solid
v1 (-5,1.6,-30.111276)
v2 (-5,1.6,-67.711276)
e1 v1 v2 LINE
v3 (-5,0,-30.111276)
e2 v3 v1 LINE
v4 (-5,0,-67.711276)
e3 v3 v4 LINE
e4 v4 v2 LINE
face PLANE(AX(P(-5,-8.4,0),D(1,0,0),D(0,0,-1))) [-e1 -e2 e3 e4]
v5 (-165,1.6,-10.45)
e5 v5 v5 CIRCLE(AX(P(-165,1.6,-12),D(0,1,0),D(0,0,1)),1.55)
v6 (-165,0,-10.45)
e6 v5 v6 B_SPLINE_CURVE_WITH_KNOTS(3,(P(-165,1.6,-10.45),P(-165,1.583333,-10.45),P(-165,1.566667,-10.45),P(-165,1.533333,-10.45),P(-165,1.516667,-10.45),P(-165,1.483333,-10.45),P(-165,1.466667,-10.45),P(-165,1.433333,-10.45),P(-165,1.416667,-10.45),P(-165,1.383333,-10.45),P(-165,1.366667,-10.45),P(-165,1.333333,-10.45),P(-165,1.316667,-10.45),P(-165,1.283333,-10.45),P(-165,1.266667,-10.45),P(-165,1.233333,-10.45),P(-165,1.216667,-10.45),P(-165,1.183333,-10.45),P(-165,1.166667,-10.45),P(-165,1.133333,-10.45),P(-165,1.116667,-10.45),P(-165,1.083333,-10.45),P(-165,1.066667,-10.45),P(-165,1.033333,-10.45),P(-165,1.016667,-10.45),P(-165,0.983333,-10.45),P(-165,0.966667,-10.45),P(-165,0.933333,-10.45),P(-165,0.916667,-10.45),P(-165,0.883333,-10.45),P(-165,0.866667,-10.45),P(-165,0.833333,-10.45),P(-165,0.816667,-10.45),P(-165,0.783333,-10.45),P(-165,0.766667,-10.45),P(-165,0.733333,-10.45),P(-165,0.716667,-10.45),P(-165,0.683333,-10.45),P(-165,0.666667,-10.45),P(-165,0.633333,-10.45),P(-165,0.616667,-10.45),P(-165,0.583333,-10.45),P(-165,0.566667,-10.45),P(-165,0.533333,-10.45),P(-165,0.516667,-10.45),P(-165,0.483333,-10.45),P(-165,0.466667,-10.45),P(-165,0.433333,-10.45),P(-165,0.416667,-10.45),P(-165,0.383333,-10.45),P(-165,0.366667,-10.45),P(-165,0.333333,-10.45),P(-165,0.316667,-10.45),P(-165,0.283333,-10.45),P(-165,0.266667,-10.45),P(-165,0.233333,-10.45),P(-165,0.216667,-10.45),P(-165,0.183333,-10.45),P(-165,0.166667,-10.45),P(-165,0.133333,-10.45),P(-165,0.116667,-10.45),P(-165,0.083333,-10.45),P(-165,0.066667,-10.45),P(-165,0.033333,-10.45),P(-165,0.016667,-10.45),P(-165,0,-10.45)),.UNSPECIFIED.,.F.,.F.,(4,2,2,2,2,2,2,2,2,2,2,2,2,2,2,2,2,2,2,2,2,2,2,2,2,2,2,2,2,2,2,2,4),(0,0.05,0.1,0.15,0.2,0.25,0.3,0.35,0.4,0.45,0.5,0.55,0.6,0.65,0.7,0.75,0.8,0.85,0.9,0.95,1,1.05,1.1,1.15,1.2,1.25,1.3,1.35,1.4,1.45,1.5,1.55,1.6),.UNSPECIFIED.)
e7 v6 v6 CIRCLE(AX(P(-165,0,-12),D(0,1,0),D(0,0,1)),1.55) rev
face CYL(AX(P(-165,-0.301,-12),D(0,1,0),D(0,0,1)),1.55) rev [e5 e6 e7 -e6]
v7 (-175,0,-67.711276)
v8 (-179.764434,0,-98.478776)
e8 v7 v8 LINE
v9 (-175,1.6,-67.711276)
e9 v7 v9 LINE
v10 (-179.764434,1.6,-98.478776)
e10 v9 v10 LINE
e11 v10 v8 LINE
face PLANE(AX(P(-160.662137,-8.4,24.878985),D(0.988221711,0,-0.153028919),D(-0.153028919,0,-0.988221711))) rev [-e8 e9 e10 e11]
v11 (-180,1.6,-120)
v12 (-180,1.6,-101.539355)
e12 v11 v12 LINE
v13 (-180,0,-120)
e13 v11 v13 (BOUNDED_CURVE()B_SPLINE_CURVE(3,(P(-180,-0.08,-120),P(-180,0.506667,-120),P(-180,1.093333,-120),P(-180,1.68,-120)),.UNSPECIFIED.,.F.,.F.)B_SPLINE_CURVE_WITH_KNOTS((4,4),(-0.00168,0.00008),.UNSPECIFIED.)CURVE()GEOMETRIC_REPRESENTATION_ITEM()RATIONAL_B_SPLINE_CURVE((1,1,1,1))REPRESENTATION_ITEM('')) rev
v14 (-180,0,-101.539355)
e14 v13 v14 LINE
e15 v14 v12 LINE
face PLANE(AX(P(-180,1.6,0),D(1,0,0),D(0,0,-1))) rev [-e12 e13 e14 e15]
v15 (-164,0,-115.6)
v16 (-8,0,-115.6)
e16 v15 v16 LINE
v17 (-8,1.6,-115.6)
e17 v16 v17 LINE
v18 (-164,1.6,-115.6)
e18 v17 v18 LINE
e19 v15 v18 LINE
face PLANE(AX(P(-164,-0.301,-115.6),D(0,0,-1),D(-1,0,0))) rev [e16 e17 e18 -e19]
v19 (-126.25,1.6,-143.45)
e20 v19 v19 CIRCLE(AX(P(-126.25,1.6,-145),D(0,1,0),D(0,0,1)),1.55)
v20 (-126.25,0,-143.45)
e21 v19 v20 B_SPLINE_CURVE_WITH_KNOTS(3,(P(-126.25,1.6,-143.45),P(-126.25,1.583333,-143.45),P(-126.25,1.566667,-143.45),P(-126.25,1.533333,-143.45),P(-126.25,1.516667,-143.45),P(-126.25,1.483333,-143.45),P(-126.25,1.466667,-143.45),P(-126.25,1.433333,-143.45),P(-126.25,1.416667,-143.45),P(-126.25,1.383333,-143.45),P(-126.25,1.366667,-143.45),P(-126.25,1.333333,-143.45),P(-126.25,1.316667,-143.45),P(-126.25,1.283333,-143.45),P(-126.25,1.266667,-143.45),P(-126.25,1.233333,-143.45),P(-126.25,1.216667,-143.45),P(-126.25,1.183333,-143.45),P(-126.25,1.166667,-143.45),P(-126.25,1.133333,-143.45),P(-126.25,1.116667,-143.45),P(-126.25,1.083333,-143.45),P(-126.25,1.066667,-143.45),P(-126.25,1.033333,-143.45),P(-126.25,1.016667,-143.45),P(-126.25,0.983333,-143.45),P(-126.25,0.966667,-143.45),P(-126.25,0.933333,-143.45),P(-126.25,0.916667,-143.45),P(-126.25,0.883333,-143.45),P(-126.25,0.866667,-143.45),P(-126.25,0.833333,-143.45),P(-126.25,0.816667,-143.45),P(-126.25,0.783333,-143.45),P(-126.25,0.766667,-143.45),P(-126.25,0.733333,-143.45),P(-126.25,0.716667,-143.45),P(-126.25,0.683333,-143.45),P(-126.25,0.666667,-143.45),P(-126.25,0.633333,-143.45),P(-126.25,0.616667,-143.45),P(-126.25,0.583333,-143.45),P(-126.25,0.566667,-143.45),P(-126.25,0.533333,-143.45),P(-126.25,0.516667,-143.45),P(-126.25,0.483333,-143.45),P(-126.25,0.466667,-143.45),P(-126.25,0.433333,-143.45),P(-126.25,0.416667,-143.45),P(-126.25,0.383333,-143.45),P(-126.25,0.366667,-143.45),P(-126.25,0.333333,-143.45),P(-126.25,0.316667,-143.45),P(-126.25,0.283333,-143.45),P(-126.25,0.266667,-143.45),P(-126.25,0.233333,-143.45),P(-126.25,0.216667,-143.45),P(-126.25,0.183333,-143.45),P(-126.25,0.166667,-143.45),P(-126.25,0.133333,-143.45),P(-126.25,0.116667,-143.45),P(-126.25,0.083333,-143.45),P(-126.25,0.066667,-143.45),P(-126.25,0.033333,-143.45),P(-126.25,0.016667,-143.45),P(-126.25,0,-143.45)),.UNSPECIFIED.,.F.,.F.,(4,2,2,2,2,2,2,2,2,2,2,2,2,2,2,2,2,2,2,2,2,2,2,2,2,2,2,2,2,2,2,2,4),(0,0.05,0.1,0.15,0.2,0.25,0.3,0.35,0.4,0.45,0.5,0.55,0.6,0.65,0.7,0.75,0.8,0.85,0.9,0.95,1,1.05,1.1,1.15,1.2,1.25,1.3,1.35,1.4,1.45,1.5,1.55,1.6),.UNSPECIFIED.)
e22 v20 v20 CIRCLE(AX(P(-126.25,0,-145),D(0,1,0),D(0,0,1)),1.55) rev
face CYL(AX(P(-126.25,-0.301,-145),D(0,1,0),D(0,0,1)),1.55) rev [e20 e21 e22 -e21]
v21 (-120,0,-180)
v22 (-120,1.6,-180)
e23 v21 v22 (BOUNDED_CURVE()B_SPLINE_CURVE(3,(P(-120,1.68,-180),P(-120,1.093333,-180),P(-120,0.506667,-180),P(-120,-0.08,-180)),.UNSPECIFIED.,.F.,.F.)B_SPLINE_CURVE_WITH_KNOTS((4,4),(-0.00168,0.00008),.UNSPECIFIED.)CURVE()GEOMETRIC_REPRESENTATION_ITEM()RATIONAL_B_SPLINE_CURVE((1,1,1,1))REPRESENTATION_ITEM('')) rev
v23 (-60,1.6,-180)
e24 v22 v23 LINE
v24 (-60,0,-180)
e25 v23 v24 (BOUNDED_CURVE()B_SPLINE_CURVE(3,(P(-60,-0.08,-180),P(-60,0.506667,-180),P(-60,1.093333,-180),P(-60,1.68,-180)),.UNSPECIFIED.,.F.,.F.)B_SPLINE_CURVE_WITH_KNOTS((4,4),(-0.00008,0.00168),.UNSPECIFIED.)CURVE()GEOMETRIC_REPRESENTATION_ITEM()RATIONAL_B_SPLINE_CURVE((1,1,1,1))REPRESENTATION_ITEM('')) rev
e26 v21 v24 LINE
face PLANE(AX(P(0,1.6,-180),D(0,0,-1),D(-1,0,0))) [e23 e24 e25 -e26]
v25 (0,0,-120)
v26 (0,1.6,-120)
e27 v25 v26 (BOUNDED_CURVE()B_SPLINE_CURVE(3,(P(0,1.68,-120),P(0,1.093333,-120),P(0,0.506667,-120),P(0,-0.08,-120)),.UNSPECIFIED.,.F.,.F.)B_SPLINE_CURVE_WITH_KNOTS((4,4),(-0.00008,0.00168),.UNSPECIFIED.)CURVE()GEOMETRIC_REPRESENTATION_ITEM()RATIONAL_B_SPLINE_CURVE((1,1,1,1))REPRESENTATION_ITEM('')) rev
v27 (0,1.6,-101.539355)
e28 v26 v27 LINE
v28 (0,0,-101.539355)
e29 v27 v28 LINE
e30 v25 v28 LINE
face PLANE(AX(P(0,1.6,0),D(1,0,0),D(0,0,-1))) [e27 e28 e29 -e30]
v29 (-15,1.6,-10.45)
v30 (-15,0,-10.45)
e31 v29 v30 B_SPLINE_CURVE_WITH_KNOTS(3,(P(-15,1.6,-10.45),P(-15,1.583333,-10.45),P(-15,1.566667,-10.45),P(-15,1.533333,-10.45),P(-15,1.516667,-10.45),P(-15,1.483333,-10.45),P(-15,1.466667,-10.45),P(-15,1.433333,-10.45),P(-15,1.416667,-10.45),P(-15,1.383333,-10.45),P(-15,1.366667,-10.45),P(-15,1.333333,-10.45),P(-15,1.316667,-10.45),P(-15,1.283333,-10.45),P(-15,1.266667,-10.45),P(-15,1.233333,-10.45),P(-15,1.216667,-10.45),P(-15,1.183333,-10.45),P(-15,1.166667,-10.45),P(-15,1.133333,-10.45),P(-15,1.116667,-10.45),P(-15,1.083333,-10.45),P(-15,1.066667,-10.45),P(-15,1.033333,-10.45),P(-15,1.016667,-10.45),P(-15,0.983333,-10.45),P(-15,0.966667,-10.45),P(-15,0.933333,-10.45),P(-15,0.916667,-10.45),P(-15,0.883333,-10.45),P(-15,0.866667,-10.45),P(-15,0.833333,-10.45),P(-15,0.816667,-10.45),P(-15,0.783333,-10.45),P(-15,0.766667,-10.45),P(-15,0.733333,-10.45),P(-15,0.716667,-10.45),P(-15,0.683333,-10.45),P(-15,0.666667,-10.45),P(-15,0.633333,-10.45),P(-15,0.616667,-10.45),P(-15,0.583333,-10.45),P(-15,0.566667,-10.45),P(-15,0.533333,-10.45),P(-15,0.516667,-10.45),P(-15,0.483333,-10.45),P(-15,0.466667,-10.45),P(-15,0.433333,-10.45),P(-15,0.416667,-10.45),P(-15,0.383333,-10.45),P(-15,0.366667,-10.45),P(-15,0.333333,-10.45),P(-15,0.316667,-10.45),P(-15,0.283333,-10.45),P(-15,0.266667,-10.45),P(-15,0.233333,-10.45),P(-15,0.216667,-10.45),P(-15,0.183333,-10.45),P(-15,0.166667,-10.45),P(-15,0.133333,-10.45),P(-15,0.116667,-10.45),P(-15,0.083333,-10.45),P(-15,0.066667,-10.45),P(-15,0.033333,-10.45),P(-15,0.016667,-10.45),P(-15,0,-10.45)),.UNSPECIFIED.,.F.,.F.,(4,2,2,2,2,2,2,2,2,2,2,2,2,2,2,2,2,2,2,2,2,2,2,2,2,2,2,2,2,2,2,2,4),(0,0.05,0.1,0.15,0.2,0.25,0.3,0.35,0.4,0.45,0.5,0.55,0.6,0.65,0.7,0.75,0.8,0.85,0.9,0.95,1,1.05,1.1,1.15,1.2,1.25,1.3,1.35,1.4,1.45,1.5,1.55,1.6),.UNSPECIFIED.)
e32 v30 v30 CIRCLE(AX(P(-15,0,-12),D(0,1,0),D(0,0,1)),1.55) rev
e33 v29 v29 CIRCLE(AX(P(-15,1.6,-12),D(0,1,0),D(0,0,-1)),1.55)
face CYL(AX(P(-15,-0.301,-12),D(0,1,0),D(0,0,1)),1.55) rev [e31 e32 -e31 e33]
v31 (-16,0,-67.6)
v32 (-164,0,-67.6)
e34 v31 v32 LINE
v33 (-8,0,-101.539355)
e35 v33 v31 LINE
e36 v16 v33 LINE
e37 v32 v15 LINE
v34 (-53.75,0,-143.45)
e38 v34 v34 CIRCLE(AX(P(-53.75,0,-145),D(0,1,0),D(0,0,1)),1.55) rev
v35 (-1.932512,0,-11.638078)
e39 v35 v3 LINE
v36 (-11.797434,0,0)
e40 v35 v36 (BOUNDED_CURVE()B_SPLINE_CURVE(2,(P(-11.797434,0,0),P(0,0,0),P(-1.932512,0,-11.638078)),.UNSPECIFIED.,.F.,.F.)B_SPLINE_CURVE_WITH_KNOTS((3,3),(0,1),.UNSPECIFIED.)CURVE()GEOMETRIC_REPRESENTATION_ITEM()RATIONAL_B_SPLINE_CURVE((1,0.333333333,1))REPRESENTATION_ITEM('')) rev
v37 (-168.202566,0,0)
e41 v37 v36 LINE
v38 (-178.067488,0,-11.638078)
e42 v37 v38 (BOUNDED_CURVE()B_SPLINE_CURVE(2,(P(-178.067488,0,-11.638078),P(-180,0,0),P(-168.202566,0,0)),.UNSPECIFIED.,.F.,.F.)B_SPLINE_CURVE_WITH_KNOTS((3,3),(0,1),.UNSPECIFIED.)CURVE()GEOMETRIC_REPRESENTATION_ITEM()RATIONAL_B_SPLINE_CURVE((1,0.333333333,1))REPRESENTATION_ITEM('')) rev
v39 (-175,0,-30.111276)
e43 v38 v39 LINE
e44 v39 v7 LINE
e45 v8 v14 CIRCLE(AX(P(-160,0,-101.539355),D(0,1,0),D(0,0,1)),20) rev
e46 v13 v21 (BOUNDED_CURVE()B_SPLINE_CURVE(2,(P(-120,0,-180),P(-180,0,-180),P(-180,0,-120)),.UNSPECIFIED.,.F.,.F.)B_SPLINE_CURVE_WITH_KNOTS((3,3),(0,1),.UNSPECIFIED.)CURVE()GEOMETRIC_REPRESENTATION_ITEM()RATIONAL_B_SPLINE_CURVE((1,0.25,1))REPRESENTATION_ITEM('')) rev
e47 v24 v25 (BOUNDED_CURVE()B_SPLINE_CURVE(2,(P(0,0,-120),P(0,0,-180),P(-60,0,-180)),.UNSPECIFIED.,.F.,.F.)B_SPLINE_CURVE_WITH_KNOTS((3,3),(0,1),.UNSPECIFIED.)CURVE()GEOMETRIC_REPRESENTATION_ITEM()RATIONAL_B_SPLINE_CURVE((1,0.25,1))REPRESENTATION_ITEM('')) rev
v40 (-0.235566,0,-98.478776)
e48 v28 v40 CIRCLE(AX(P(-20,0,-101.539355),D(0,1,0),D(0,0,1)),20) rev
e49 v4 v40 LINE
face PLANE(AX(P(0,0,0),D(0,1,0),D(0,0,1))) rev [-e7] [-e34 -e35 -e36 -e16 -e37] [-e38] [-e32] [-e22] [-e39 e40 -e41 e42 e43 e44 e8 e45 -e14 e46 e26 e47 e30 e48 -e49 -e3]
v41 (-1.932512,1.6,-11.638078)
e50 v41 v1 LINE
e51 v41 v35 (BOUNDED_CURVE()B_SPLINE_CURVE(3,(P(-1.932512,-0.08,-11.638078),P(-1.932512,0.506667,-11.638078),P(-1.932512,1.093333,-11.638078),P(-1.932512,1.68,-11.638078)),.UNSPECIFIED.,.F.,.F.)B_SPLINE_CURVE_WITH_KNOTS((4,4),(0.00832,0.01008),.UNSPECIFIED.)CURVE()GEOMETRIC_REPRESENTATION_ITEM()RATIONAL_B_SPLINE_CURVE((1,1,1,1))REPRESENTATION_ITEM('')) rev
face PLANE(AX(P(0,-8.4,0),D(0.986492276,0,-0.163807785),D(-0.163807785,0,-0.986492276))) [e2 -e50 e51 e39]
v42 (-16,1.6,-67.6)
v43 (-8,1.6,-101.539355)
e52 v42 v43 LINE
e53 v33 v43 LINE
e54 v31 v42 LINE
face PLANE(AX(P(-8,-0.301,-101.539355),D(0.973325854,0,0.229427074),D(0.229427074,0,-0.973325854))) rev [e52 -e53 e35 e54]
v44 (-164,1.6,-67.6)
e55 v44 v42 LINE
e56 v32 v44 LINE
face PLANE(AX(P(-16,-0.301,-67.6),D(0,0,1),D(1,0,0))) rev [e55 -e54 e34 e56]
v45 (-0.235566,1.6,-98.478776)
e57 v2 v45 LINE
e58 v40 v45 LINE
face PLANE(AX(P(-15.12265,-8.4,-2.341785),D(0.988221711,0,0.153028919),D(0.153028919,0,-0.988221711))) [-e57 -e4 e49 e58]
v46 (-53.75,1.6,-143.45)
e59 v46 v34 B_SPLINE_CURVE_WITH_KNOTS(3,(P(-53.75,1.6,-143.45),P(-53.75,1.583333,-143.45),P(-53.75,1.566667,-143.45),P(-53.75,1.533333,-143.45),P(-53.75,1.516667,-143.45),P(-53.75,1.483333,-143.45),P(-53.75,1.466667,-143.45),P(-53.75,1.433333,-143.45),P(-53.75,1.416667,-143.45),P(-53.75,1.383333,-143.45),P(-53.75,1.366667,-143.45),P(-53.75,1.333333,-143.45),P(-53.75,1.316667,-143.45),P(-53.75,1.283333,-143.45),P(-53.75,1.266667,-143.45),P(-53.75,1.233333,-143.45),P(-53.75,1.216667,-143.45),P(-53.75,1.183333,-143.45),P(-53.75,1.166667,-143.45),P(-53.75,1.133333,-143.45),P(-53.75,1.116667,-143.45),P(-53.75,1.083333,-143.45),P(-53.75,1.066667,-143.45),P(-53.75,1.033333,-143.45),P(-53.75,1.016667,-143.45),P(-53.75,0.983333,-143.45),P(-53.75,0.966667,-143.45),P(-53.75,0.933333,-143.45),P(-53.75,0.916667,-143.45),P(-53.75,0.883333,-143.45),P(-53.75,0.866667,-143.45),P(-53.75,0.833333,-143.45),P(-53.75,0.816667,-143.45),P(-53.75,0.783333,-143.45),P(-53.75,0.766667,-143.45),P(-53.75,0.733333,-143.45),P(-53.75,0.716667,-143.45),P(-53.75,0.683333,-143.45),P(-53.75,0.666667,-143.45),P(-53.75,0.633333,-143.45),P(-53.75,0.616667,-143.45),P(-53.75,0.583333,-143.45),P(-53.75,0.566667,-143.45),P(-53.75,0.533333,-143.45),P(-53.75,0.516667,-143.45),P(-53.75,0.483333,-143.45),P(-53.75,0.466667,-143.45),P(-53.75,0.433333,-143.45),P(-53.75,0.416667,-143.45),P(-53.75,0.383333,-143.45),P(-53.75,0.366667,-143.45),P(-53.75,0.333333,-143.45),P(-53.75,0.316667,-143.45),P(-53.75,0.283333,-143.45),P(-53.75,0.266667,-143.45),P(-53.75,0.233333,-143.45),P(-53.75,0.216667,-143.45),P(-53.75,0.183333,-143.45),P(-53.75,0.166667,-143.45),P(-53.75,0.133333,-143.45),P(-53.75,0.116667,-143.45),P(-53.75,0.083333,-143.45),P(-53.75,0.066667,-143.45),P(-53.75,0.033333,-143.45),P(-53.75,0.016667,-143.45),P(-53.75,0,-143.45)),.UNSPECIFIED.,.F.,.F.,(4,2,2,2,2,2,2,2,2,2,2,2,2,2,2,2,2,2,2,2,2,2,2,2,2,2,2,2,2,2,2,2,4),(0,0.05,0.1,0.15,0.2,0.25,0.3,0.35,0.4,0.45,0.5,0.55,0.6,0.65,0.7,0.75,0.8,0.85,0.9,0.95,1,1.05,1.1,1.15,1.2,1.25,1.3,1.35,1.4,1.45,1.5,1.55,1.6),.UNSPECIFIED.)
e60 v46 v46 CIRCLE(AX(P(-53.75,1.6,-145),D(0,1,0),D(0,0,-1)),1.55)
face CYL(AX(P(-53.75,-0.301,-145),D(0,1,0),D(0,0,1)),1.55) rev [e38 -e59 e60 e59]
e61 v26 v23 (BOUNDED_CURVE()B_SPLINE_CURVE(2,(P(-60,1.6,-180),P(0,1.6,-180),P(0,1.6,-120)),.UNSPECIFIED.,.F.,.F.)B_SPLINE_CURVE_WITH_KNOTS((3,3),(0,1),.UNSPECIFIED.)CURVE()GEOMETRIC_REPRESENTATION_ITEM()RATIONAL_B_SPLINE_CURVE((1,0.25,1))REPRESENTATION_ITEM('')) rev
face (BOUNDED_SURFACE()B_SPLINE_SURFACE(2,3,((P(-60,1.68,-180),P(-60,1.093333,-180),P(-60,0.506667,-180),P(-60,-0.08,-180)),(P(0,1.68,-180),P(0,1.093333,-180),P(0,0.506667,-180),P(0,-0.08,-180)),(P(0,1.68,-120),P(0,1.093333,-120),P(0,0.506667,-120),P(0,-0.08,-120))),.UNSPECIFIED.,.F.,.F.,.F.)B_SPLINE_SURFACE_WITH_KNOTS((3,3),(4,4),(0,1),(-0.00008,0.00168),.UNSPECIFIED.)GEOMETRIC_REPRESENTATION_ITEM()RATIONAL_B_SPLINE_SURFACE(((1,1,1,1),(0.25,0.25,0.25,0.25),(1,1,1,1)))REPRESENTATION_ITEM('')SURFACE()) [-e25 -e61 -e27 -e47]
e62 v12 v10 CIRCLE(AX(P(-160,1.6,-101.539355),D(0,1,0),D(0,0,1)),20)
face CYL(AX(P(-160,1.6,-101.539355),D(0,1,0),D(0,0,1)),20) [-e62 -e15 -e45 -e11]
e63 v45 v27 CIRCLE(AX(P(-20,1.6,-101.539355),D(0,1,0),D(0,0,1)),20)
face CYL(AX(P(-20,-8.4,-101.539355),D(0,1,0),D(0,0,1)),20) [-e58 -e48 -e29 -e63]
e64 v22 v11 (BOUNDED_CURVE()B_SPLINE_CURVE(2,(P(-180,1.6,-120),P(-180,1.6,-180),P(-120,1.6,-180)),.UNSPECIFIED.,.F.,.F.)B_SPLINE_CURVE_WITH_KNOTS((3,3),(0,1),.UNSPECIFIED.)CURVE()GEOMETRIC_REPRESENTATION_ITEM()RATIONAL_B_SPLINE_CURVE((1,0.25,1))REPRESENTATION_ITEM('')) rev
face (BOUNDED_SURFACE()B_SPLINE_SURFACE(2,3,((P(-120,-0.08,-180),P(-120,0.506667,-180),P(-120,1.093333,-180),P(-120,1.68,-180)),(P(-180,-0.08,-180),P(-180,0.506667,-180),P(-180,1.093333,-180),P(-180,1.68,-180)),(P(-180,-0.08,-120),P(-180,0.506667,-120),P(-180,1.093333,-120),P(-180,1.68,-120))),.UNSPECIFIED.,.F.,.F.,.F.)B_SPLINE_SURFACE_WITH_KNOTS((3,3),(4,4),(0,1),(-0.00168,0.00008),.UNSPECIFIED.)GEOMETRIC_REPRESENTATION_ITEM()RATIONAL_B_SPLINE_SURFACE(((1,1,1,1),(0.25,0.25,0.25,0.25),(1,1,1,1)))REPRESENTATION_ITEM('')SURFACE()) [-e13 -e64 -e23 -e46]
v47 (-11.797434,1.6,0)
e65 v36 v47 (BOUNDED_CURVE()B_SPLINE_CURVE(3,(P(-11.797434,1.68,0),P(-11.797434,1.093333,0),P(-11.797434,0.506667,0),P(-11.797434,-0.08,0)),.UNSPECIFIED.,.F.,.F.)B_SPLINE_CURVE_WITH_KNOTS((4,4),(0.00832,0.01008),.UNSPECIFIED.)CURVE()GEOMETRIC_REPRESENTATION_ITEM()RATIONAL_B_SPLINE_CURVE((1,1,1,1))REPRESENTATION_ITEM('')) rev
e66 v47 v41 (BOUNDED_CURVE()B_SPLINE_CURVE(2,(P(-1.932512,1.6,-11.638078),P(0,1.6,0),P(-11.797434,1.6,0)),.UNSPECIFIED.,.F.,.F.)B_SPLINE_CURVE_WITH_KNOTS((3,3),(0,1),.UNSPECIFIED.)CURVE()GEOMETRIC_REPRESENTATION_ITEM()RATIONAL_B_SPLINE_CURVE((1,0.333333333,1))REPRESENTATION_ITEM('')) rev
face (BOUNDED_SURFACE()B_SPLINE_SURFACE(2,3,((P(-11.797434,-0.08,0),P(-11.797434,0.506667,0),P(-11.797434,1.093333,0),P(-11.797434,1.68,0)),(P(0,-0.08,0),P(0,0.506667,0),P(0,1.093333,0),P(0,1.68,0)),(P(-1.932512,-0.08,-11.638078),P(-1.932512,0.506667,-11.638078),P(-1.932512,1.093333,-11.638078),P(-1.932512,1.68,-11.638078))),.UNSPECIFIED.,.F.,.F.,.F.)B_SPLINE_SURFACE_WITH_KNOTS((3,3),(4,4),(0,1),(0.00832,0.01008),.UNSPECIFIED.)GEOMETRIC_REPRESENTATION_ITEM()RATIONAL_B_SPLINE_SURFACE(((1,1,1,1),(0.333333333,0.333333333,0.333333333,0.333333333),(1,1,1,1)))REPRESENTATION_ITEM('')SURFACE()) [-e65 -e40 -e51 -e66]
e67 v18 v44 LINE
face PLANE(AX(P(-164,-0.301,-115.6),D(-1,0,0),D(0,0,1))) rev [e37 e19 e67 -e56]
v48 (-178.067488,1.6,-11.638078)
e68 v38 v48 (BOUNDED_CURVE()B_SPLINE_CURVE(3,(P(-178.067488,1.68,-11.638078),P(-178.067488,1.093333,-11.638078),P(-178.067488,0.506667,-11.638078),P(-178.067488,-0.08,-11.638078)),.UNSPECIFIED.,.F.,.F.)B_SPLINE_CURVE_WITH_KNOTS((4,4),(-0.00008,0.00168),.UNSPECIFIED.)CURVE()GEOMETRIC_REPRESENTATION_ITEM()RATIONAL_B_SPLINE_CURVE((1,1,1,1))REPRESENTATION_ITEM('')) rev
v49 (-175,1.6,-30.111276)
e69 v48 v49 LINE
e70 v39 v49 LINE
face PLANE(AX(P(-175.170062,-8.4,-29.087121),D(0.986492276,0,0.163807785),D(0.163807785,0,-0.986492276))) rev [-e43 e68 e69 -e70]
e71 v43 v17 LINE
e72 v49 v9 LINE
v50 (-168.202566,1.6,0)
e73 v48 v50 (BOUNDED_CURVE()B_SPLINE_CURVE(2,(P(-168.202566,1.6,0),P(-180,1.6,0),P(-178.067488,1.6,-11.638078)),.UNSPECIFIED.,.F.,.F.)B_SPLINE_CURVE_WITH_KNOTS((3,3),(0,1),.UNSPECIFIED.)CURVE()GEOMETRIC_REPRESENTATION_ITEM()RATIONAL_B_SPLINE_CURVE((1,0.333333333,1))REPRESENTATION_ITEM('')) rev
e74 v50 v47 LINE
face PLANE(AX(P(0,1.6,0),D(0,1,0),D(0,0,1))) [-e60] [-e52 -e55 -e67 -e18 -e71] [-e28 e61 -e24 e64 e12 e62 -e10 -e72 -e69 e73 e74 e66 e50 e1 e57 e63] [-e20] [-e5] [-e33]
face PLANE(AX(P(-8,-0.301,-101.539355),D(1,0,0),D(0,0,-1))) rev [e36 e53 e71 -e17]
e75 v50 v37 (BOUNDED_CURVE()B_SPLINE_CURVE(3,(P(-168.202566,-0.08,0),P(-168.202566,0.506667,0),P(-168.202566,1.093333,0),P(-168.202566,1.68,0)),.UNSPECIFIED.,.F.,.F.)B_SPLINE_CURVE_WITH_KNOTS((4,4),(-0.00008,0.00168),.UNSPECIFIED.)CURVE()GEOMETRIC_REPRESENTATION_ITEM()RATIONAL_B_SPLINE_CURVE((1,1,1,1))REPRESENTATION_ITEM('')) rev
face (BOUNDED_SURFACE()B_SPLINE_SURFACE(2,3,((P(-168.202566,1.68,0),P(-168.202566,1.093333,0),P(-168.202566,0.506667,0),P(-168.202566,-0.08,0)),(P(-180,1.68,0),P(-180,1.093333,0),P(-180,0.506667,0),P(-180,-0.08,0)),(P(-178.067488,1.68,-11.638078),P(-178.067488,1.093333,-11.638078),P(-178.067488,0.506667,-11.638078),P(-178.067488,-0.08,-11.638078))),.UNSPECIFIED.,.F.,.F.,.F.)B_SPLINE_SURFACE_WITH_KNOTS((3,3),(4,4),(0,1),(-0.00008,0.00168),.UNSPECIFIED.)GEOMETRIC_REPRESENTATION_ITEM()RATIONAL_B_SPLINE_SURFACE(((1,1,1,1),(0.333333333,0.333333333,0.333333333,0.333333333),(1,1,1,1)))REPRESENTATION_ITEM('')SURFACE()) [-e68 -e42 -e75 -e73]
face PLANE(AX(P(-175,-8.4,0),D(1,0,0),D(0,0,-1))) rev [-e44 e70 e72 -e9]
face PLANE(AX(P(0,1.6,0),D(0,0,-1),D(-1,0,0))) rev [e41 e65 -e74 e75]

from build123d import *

# Parameters (mm, degrees)
SKETCH1_W           = 80
SKETCH1_H           = 30
SKETCH1_W_2         = 50
BOSS_EXTRUDE1_DEPTH = 1.6
FILLET1_SIZE        = 60
SKETCH6_W           = 80
SKETCH6_H           = 30
CUT_EXTRUDE1_DEPTH  = 10
FILLET3_R           = 20
CUT_EXTRUDE3_REACH  = 256.563
CUT_EXTRUDE5_REACH  = 256.563
SKETCH11_R          = 1.55


with BuildPart() as part:
    # Sketch1 → Boss-Extrude1 (new body)
    with BuildSketch(Plane(origin=(0, 0, 0), x_dir=(1, 0, 0), z_dir=(0, 1, 0))):
        with Locations((-90, -15)):
            Rectangle(SKETCH1_W, SKETCH1_H)
        Polygon((0, 180), (-180, 180), (-180, 30), (-130, 30), (-50, 30), (0, 30), align=None)
        with Locations((-25, 15)):
            Rectangle(SKETCH1_W_2, SKETCH1_H)
        with Locations((-155, 15)):
            Rectangle(SKETCH1_W_2, SKETCH1_H)
        with Locations((-90, 15)):
            Rectangle(SKETCH1_W, SKETCH1_H)
    extrude(amount=BOSS_EXTRUDE1_DEPTH)

    # Fillet1
    # a fillet whose section is not a circle: 60 mm, written as the material it takes off along each edge
    with BuildSketch(Plane(origin=(0, -150, -180), x_dir=(0, 0, 1), z_dir=(0, 1, 0)), Plane(origin=(-180, -150, -180), x_dir=(1, 0, 0), z_dir=(0, 1, 0))) as fillet1_piece_1:
        with BuildLine():
            Bezier((FILLET1_SIZE, 0), (0, 0), (0, -FILLET1_SIZE), weights=[1, 0.25, 1])
            Line((0, -FILLET1_SIZE), (0, 0))
            Line((0, 0), (FILLET1_SIZE, 0))
        make_face()
    extrude(amount=301.6, mode=Mode.SUBTRACT)

    # Sketch6 → Cut-Extrude1 (cut)
    with BuildSketch(Plane(origin=(0, 1.6, 0), x_dir=(1, 0, 0), z_dir=(0, 1, 0))):
        with Locations((-90, -15)):
            Rectangle(SKETCH6_W, SKETCH6_H)
        Polygon((-180, 100), (-180, 0), (-175, 30.1112758), (-175, 67.7112758), align=None)
        Polygon((-5, 30.1112758), (0, 0), (0, 100), (-5, 67.7112758), align=None)
    extrude(amount=-CUT_EXTRUDE1_DEPTH, mode=Mode.SUBTRACT)

    # Fillet2
    # a fillet whose section is not a circle: 10 mm, written as the material it takes off along each edge
    with BuildSketch(Plane(origin=(-180, -29.493585843, 0), x_dir=(1, 0, 0), z_dir=(0, 1, 0)), Plane(origin=(0, -29.493585843, 0), x_dir=(-0.16380778451733694, 0, -0.9864922755559323), z_dir=(0, 1, 0))) as fillet2_piece_1:
        with BuildLine():
            Bezier((11.797434337, 0), (0, 0), (1.932511582, 11.638077845), weights=[1, 0.333333333, 1])
            Line((1.932511582, 11.638077845), (0, 0))
            Line((0, 0), (11.797434337, 0))
        make_face()
    extrude(amount=60.587171687, mode=Mode.SUBTRACT)

    # Fillet3
    fillet3_edges = [part.edges().sort_by_distance(p)[0] for p in [
        (0, 0.8, -100),
        (-180, 0.8, -100),
    ]]
    fillet(fillet3_edges, radius=FILLET3_R)

    # Sketch9 → Cut-Extrude3 (cut, up to next)
    with BuildSketch(Plane(origin=(0, 1.6, 0), x_dir=(1, 0, 0), z_dir=(0, 1, 0)), mode=Mode.PRIVATE) as cut_extrude3_sk1:
        Polygon((-164, 115.6), (-164, 67.6), (-16, 67.6), (-8, 101.53935467), (-8, 115.6), align=None)
    cut_extrude3_tool1 = extrude(cut_extrude3_sk1.sketch, amount=-CUT_EXTRUDE3_REACH, mode=Mode.PRIVATE) & part.part
    add(cut_extrude3_tool1.solids().sort_by_distance((-87.391012, 1.6, -91.83426))[0], mode=Mode.SUBTRACT)

    # Sketch11 → Cut-Extrude5 (cut, up to next)
    with BuildSketch(Plane(origin=(0, 1.6, 0), x_dir=(1, 0, 0), z_dir=(0, 1, 0)), mode=Mode.PRIVATE) as cut_extrude5_sk1:
        with Locations(Location((-165, 12, 0), (0, 0, 270))):
            Circle(SKETCH11_R)
    cut_extrude5_tool1 = extrude(cut_extrude5_sk1.sketch, amount=-CUT_EXTRUDE5_REACH, mode=Mode.PRIVATE) & part.part
    # Sketch11 → Cut-Extrude5 (cut, up to next)
    with BuildSketch(Plane(origin=(0, 1.6, 0), x_dir=(1, 0, 0), z_dir=(0, 1, 0)), mode=Mode.PRIVATE) as cut_extrude5_sk2:
        with Locations(Location((-126.25, 145, 0), (0, 0, 270))):
            Circle(SKETCH11_R)
    cut_extrude5_tool2 = extrude(cut_extrude5_sk2.sketch, amount=-CUT_EXTRUDE5_REACH, mode=Mode.PRIVATE) & part.part
    # Sketch11 → Cut-Extrude5 (cut, up to next)
    with BuildSketch(Plane(origin=(0, 1.6, 0), x_dir=(1, 0, 0), z_dir=(0, 1, 0)), mode=Mode.PRIVATE) as cut_extrude5_sk3:
        with Locations(Location((-15, 12, 0), (0, 0, 270))):
            Circle(SKETCH11_R)
    cut_extrude5_tool3 = extrude(cut_extrude5_sk3.sketch, amount=-CUT_EXTRUDE5_REACH, mode=Mode.PRIVATE) & part.part
    # Sketch11 → Cut-Extrude5 (cut, up to next)
    with BuildSketch(Plane(origin=(0, 1.6, 0), x_dir=(1, 0, 0), z_dir=(0, 1, 0)), mode=Mode.PRIVATE) as cut_extrude5_sk4:
        with Locations(Location((-53.75, 145, 0), (0, 0, 270))):
            Circle(SKETCH11_R)
    cut_extrude5_tool4 = extrude(cut_extrude5_sk4.sketch, amount=-CUT_EXTRUDE5_REACH, mode=Mode.PRIVATE) & part.part
    add(cut_extrude5_tool1.solids().sort_by_distance((-165, 1.6, -12))[0], mode=Mode.SUBTRACT)
    add(cut_extrude5_tool2.solids().sort_by_distance((-126.25, 1.6, -145))[0], mode=Mode.SUBTRACT)
    add(cut_extrude5_tool3.solids().sort_by_distance((-15, 1.6, -12))[0], mode=Mode.SUBTRACT)
    add(cut_extrude5_tool4.solids().sort_by_distance((-53.75, 1.6, -145))[0], mode=Mode.SUBTRACT)


solid = part.part
